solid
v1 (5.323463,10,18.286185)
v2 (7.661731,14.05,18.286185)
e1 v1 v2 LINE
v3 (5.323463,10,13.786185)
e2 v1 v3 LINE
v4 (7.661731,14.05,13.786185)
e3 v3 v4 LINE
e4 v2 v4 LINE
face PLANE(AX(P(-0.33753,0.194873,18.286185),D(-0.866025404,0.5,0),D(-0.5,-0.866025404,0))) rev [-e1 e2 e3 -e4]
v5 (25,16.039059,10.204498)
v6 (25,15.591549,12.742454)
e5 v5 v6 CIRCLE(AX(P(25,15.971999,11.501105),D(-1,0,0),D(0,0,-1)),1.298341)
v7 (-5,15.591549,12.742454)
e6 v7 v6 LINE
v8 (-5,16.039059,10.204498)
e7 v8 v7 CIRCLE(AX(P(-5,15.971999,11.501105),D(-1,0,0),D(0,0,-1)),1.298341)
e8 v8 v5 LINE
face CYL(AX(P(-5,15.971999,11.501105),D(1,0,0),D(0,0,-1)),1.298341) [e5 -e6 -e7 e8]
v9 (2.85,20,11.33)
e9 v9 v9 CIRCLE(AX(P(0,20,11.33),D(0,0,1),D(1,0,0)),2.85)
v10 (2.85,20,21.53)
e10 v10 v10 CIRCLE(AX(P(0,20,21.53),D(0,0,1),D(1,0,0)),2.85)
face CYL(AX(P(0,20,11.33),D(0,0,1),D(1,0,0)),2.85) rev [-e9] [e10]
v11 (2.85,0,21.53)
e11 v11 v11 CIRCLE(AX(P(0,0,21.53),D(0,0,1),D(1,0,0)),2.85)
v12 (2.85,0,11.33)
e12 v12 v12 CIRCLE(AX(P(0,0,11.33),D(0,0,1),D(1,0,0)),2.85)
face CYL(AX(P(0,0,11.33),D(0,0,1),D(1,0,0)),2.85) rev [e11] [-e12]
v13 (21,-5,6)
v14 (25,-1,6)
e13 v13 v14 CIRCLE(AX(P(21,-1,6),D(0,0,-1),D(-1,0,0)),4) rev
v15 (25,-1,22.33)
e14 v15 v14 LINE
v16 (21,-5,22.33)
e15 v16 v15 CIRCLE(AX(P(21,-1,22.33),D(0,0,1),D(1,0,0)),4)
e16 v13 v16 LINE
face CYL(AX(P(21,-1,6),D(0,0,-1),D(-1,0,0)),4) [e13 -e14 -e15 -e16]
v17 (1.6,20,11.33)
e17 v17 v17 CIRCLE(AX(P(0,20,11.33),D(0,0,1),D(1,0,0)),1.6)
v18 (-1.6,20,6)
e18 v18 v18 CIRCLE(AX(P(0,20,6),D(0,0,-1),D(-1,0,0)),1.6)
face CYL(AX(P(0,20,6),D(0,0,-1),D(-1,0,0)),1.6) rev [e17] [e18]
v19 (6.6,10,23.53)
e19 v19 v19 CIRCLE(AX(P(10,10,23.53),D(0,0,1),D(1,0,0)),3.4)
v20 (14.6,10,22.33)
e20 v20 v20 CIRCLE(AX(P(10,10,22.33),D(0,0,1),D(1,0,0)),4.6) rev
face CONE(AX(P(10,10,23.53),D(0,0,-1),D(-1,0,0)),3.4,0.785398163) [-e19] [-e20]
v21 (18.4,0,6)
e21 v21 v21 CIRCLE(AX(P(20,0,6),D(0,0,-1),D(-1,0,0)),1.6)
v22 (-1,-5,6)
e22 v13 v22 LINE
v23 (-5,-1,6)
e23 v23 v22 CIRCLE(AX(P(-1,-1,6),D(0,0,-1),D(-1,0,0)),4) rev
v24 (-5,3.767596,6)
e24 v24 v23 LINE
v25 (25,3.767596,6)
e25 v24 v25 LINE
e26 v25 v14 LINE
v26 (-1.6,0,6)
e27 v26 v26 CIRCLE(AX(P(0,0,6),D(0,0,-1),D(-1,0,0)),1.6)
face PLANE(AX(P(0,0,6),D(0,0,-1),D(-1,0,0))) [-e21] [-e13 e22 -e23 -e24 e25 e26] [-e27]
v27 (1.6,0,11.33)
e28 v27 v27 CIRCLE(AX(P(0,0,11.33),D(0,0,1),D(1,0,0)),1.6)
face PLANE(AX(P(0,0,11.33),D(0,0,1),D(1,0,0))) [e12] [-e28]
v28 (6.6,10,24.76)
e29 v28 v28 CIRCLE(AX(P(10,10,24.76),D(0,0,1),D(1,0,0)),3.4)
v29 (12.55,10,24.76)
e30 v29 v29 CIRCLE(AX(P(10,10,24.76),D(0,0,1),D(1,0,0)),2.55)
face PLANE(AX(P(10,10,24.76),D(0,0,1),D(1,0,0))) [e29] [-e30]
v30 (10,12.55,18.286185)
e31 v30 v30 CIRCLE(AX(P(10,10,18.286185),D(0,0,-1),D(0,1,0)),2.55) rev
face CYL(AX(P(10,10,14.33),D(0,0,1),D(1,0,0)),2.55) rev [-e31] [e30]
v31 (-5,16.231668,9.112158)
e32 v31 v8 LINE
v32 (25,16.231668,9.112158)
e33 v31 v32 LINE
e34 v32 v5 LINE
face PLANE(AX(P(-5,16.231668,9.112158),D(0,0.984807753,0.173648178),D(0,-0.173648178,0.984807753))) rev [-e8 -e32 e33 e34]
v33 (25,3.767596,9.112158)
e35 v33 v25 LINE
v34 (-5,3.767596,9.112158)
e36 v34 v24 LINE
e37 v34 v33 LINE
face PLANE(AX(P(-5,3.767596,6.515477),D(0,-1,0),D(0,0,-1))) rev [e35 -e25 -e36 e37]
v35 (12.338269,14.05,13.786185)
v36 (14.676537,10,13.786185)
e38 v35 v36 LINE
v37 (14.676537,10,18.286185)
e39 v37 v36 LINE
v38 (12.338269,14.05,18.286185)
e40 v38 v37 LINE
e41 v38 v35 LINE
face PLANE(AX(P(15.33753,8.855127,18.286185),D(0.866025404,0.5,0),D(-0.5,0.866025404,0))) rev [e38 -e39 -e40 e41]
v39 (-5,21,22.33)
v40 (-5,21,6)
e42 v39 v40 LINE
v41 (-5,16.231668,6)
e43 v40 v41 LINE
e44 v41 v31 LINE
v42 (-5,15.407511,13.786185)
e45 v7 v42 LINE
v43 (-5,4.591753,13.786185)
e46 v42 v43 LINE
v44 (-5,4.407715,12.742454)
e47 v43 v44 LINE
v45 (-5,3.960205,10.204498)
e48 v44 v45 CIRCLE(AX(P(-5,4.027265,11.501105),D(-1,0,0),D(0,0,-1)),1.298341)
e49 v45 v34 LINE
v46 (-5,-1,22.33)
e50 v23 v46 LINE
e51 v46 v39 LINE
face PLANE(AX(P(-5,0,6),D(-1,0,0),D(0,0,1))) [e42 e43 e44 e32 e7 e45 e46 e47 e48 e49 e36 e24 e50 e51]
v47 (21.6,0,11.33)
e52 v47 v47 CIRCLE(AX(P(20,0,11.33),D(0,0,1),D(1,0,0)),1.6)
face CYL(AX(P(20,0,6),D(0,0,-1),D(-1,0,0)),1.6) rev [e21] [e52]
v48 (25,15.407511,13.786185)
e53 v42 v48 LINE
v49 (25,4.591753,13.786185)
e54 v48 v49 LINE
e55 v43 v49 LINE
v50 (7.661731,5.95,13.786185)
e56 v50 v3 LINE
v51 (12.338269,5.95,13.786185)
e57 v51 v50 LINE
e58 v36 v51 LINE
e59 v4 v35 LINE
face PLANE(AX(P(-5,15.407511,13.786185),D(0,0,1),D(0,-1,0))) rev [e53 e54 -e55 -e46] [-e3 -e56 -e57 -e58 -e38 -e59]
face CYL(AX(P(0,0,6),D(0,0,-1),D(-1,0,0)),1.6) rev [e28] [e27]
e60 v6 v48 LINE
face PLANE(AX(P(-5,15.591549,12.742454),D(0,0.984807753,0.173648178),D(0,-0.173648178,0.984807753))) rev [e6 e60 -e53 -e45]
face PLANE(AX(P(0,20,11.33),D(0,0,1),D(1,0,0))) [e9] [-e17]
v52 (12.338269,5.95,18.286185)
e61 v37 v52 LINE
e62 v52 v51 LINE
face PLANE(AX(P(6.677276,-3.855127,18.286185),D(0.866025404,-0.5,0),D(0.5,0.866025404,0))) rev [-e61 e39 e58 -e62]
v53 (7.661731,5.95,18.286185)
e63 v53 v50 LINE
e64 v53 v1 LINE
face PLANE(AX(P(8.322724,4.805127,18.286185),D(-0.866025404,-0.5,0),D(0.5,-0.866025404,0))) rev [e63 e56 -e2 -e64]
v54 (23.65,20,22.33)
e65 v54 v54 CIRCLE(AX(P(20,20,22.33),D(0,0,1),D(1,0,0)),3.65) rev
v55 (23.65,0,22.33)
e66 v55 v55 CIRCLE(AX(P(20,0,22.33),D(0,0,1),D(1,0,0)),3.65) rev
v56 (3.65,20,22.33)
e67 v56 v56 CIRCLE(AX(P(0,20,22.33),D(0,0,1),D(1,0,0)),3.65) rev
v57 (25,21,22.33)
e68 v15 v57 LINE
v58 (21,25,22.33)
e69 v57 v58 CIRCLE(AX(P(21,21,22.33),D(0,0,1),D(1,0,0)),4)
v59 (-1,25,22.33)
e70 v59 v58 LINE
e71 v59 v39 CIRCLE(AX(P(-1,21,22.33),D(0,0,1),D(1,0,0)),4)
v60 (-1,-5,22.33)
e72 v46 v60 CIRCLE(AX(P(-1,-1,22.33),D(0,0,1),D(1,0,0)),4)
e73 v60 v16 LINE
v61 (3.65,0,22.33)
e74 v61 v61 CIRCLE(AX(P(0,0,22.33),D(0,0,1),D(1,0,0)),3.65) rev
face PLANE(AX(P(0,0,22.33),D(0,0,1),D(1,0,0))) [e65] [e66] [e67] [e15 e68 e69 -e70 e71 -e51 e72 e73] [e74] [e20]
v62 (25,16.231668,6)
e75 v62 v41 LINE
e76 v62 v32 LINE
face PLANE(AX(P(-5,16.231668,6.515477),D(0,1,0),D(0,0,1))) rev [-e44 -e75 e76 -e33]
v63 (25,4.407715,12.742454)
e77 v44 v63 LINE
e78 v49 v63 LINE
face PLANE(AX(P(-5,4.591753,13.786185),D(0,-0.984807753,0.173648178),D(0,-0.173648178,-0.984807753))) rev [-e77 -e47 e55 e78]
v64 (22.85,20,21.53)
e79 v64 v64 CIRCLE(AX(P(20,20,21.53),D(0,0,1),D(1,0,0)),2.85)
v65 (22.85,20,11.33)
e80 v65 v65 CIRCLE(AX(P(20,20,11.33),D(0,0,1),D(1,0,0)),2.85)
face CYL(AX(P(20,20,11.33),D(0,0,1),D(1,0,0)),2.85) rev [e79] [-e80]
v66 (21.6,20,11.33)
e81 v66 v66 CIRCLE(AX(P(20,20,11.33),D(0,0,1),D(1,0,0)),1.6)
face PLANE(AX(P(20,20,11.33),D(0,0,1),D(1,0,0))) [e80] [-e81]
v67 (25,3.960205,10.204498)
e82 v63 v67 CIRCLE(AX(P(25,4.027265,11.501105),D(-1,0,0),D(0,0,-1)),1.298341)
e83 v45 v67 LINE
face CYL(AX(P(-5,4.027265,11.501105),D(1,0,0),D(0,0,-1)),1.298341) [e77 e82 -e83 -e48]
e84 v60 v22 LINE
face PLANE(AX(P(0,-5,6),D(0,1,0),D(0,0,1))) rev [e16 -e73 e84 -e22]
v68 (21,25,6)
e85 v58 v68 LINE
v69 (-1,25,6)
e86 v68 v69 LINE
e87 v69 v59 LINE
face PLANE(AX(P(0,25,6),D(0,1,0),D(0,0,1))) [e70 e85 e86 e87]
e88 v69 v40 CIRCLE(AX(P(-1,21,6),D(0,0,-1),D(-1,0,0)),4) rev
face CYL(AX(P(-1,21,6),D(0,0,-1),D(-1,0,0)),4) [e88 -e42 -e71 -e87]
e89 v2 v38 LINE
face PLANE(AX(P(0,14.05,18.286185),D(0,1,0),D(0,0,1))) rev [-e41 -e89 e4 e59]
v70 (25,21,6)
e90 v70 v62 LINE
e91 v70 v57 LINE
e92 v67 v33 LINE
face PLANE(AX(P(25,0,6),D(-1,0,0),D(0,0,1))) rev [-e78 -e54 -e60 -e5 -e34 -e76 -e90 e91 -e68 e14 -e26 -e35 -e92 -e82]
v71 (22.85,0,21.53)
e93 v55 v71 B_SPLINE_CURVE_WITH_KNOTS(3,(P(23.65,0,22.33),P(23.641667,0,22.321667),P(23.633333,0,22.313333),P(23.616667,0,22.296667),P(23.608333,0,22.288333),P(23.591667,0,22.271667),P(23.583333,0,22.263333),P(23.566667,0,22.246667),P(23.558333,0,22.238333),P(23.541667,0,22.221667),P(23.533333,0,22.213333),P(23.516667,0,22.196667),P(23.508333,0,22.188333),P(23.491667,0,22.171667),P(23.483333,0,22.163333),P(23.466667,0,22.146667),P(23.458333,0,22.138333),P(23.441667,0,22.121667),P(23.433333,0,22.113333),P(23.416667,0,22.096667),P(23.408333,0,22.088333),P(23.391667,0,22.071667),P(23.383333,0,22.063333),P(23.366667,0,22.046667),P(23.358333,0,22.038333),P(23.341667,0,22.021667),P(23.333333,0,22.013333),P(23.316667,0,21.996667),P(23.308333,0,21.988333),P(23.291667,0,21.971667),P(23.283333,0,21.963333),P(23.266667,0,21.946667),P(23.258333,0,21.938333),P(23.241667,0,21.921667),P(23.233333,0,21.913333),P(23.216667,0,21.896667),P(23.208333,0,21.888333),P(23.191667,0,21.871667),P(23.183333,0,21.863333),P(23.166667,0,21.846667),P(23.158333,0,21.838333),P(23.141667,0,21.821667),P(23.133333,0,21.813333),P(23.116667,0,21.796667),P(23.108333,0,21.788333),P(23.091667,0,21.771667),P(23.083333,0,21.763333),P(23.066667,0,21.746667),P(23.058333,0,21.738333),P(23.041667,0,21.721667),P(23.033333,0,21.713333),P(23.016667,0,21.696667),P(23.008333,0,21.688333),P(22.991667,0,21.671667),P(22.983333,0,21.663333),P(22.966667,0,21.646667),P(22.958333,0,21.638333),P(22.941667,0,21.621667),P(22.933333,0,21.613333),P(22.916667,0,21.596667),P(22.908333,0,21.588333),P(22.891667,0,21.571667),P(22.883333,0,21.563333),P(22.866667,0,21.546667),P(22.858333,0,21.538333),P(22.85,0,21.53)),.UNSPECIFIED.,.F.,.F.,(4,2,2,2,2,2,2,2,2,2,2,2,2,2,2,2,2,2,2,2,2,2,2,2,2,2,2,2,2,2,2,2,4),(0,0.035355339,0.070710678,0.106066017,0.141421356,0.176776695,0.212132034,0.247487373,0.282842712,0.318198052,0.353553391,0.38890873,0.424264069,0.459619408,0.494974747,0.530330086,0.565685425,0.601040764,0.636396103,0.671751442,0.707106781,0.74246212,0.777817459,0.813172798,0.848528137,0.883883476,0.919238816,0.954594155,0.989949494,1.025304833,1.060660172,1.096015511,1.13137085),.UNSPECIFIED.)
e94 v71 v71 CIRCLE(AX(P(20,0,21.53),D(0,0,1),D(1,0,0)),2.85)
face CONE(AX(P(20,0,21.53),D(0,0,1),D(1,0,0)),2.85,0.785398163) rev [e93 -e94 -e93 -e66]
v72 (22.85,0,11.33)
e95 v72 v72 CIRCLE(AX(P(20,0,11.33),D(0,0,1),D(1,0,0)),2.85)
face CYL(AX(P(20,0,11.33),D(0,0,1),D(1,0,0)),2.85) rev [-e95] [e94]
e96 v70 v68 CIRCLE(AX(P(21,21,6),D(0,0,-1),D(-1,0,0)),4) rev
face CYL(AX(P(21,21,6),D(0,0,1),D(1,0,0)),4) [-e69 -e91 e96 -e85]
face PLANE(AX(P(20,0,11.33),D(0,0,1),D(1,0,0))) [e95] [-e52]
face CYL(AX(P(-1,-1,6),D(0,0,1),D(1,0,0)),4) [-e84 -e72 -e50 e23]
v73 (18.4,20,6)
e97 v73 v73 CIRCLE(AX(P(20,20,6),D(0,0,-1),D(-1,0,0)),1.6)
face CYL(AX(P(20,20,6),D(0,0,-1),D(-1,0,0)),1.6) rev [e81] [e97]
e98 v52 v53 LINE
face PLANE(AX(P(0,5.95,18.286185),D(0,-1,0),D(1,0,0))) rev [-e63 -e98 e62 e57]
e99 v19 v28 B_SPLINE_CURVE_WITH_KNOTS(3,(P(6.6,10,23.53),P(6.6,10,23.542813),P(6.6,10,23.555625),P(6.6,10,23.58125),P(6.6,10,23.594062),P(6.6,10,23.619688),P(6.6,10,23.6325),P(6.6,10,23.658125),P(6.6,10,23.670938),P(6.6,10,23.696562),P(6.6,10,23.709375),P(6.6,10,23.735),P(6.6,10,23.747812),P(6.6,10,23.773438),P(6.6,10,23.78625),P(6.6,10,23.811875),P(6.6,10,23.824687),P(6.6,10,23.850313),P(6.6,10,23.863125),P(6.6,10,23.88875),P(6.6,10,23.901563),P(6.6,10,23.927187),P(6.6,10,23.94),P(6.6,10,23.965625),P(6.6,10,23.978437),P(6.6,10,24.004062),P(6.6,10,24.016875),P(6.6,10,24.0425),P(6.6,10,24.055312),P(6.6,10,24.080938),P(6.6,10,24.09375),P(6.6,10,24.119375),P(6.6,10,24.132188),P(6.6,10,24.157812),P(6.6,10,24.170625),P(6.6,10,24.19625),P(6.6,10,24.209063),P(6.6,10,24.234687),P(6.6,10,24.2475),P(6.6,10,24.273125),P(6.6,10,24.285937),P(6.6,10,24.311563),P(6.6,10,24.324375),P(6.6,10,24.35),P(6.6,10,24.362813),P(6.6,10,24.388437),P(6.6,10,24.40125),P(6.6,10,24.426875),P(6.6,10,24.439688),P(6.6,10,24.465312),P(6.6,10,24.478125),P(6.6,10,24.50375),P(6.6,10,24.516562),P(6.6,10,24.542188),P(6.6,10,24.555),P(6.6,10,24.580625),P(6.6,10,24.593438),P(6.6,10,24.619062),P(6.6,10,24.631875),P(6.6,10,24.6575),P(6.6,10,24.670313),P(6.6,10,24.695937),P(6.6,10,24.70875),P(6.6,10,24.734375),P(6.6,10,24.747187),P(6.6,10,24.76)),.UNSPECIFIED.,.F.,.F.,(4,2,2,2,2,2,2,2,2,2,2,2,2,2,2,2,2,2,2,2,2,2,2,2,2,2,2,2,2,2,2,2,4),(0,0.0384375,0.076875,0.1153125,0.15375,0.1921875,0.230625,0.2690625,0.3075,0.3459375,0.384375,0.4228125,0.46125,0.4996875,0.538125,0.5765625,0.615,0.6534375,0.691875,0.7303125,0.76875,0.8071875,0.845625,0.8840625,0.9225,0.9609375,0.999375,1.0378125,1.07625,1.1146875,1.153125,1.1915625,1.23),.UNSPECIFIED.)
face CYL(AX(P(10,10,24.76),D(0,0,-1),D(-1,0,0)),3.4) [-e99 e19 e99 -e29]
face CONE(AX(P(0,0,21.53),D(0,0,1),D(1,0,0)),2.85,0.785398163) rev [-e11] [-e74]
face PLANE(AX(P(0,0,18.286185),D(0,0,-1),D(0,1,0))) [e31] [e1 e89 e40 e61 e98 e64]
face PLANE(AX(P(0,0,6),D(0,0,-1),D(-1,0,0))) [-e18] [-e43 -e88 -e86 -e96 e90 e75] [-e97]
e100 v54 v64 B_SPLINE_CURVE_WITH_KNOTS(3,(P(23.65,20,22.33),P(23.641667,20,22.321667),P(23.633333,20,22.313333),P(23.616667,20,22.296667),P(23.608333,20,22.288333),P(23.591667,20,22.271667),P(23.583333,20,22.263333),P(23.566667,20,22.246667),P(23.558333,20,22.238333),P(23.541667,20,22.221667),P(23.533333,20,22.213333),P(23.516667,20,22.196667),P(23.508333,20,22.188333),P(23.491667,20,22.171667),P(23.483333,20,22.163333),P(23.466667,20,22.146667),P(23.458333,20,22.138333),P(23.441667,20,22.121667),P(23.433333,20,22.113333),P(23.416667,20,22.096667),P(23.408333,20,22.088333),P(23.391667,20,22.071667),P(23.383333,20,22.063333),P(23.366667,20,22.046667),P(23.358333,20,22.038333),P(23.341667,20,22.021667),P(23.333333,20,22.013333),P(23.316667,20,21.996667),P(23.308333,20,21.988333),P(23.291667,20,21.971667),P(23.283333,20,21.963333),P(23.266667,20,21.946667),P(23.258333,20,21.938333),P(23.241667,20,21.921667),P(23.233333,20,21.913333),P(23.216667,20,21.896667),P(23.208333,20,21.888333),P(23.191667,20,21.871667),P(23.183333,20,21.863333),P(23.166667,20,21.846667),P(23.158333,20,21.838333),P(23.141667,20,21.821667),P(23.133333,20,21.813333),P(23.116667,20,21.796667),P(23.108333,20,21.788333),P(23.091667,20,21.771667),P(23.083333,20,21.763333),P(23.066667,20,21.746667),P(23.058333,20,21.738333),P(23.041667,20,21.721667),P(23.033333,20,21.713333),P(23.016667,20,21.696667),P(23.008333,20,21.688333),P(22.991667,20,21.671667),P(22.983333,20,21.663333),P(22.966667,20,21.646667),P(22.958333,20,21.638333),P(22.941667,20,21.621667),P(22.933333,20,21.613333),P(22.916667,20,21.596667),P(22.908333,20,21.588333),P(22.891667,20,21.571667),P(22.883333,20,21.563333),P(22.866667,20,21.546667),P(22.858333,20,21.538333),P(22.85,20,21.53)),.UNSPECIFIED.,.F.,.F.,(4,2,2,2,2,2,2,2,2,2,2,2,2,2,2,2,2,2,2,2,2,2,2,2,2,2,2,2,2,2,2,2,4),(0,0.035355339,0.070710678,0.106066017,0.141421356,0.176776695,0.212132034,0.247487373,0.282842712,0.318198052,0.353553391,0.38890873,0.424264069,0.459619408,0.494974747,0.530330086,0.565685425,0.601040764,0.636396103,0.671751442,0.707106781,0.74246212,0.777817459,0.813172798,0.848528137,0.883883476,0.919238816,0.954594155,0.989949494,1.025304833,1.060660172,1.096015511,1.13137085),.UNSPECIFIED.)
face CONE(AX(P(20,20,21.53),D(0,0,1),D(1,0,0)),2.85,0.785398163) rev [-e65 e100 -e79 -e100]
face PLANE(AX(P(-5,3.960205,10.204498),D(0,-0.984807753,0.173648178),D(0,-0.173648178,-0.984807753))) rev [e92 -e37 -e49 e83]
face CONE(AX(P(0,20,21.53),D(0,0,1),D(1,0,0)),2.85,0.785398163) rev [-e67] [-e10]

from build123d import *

# Parameters (mm, degrees)
SKETCH1_W                  = 30
SKETCH1_H                  = 30
SKETCH1_R                  = 1.6
SKETCH1_W_2                = 70
SKETCH1_H_2                = 12
BOSS_EXTRUDE1_DEPTH        = 6
SKETCH1_3_W                = 30
SKETCH1_3_H                = 30
SKETCH1_3_R                = 1.6
BOSS_EXTRUDE2_DEPTH        = 22.33
CUT_EXTRUDE1_DEPTH         = 78.612040947
SKETCH3_R                  = 2.55
CUT_EXTRUDE2_DEPTH         = 8
CUT_EXTRUDE3_DEPTH         = 4.5
SKETCH6_R                  = 5
CUT_EXTRUDE5_DEPTH         = 8.6
SKETCH7_R                  = 1.6
CUT_EXTRUDE6_DEPTH         = 101.740403513
SKETCH8_R                  = 2.85
CUT_EXTRUDE7_DEPTH         = 11
BOSS_EXTRUDE3_START        = 2.43
SKETCH9_R                  = 3.4
SKETCH9_R_2                = 2.55
BOSS_EXTRUDE3_DEPTH        = 2.43
CHAMFER1_SIZE              = 1.2
FILLET3_R                  = 4
CHAMFER2_SIZE              = 0.8
CUT_EXTRUDE8_DEPTH         = 3
CHAMFER3_SIZE              = 0.8
LPATTERN1_COUNT            = 3
LPATTERN1_PITCH            = 25
CHAMFER3_OF_LPATTERN1_SIZE = 0.8
SKETCH12_W                 = 103.210606925
SKETCH12_H                 = 33.832940417
CUT_EXTRUDE9_DEPTH         = 6


with BuildPart() as part:
    # Sketch1 → Boss-Extrude1 (new body)
    # profile 1 of 2: a face of its own
    with BuildSketch(Plane.XY):
        with Locations((10, 10)):
            Rectangle(SKETCH1_W, SKETCH1_H)
        with Locations((20, 0)):
            Circle(SKETCH1_R, mode=Mode.SUBTRACT)
        with Locations((20, 20)):
            Circle(SKETCH1_R, mode=Mode.SUBTRACT)
        with Locations((0, 20)):
            Circle(SKETCH1_R, mode=Mode.SUBTRACT)
        Circle(SKETCH1_R, mode=Mode.SUBTRACT)
    # profile 2 of 2: a face of its own
    with BuildSketch(Plane.XY):
        with Locations((60, 10)):
            Rectangle(SKETCH1_W_2, SKETCH1_H_2)
    extrude(amount=BOSS_EXTRUDE1_DEPTH)

    # Sketch1<3> → Boss-Extrude2 (add)
    with BuildSketch(Plane.XY):
        with Locations((10, 10)):
            Rectangle(SKETCH1_3_W, SKETCH1_3_H)
        with Locations((20, 0)):
            Circle(SKETCH1_3_R, mode=Mode.SUBTRACT)
        with Locations((20, 20)):
            Circle(SKETCH1_3_R, mode=Mode.SUBTRACT)
        with Locations((0, 20)):
            Circle(SKETCH1_3_R, mode=Mode.SUBTRACT)
        Circle(SKETCH1_3_R, mode=Mode.SUBTRACT)
    extrude(amount=BOSS_EXTRUDE2_DEPTH)

    # Sketch2 → Cut-Extrude1 (cut, through all)
    with BuildSketch(Plane(origin=(25, 0, 0), x_dir=(0, 0, -1), z_dir=(1, 0, 0))):
        with BuildLine():
            Line((-6.515476918, 16.231667643), (-9.112158418, 16.231667643))
            Line((-9.112158418, 16.231667643), (-10.20449761, 16.039058771))
            ThreePointArc((-10.20449761, 16.039058771), (-11.275650893, 14.693383456), (-12.742453793, 15.59154862))
            Line((-12.742453793, 15.59154862), (-13.786185118, 15.407510627))
            Line((-13.786185118, 15.407510627), (-13.786185118, 4.591753459))
            Line((-13.786185118, 4.591753459), (-12.742453793, 4.407715465))
            ThreePointArc((-12.742453793, 4.407715465), (-11.275650893, 5.305880629), (-10.20449761, 3.960205314))
            Line((-10.20449761, 3.960205314), (-9.112158418, 3.767596443))
            Line((-9.112158418, 3.767596443), (-6.515476918, 3.767596443))
            Line((-6.515476918, 3.767596443), (-5.902540869, 3.767596443))
            Line((-5.902540869, 3.767596443), (-5.902540869, 16.231667643))
            Line((-5.902540869, 16.231667643), (-6.515476918, 16.231667643))
        make_face()
    extrude(amount=-CUT_EXTRUDE1_DEPTH, mode=Mode.SUBTRACT)

    # Sketch3 → Cut-Extrude2 (cut)
    with BuildSketch(Plane.XY.offset(22.33)):
        with Locations((10, 10)):
            Circle(SKETCH3_R)
    extrude(amount=-CUT_EXTRUDE2_DEPTH, mode=Mode.SUBTRACT)

    # Sketch5 → Cut-Extrude3 (cut)
    with BuildSketch(Plane(origin=(0, 0, 13.786185118), x_dir=(-1, 0, 0), z_dir=(0, 0, -1))):
        Polygon((-5.32346282, 10), (-7.66173141, 14.05), (-12.33826859, 14.05), (-14.67653718, 10), (-12.33826859, 5.95), (-7.66173141, 5.95), align=None)
    extrude(amount=-CUT_EXTRUDE3_DEPTH, mode=Mode.SUBTRACT)

    # Sketch6 → Cut-Extrude5 (cut)
    with BuildSketch(Plane(origin=(0, 0, 0), x_dir=(-1, 0, 0), z_dir=(0, 0, -1))):
        with Locations((-10, 10)):
            Circle(SKETCH6_R)
    extrude(amount=-CUT_EXTRUDE5_DEPTH, mode=Mode.SUBTRACT)

    # Sketch7 → Cut-Extrude6 (cut, through all)
    with BuildSketch(Plane(origin=(0, 0, 0), x_dir=(-1, 0, 0), z_dir=(0, 0, -1))):
        with BuildLine():
            ThreePointArc((-90.1, 10), (-88.5, 8.4), (-86.9, 10))
            Line((-86.9, 10), (-90.1, 10))
        make_face()
        with BuildLine():
            Line((-90.1, 10), (-86.9, 10))
            ThreePointArc((-86.9, 10), (-88.5, 11.6), (-90.1, 10))
        make_face()
        with Locations((-63.5, 10)):
            Circle(SKETCH7_R)
        with Locations((-38.5, 10)):
            Circle(SKETCH7_R)
    extrude(amount=-CUT_EXTRUDE6_DEPTH, mode=Mode.SUBTRACT)

    # Sketch8 → Cut-Extrude7 (cut)
    with BuildSketch(Plane.XY.offset(22.33)):
        with Locations((20, 20)):
            Circle(SKETCH8_R)
        with Locations((20, 0)):
            Circle(SKETCH8_R)
        Circle(SKETCH8_R)
        with Locations((0, 20)):
            Circle(SKETCH8_R)
    extrude(amount=-CUT_EXTRUDE7_DEPTH, mode=Mode.SUBTRACT)

    # Sketch9 → Boss-Extrude3 (add)
    with BuildSketch(Plane.XY.offset(22.33).offset(BOSS_EXTRUDE3_START)):
        with Locations(Location((10, 10, 0), (0, 0, 180))):
            Circle(SKETCH9_R)
        with Locations((10, 10)):
            Circle(SKETCH9_R_2, mode=Mode.SUBTRACT)
    extrude(amount=-BOSS_EXTRUDE3_DEPTH)

    # Chamfer1
    chamfer1_edges = [part.edges().sort_by_distance(p)[0] for p in [
        (13.4, 10, 22.33),
    ]]
    chamfer(chamfer1_edges, length=CHAMFER1_SIZE)

    # Fillet3
    # the kernel refuses this fillet: 4 mm, written as the material it adds along each edge
    with BuildSketch(Plane(origin=(25, 4, 0), x_dir=(0, -1, 0), z_dir=(0, 0, 1))) as fillet3_piece_1:
        with BuildLine():
            CenterArc((FILLET3_R, FILLET3_R), FILLET3_R, 180, 90)
            Line((0, FILLET3_R), (0, 0))
            Line((0, 0), (FILLET3_R, 0))
        make_face()
    extrude(amount=5.902540869)
    with BuildSketch(Plane(origin=(25, 16, 0), x_dir=(0, 1, 0), z_dir=(0, 0, 1))) as fillet3_piece_2:
        with BuildLine():
            CenterArc((FILLET3_R, -FILLET3_R), FILLET3_R, 90, 90)
            Line((0, -FILLET3_R), (0, 0))
            Line((0, 0), (FILLET3_R, 0))
        make_face()
    extrude(amount=5.902540869)
    # the kernel refuses this fillet: 4 mm, written as the material it takes off along each edge
    with BuildSketch(Plane(origin=(-5, -5, 32.33), x_dir=(1, 0, 0), z_dir=(0, 0, -1)), Plane(origin=(-5, 25, 32.33), x_dir=(0, -1, 0), z_dir=(0, 0, -1)), Plane(origin=(25, 25, -10), x_dir=(0, -1, 0), z_dir=(0, 0, 1)), Plane(origin=(25, -5, -10), x_dir=(-1, 0, 0), z_dir=(0, 0, 1))) as fillet3_2_piece_1:
        with BuildLine():
            CenterArc((FILLET3_R, -FILLET3_R), FILLET3_R, 90, 90)
            Line((0, -FILLET3_R), (0, 0))
            Line((0, 0), (FILLET3_R, 0))
        make_face()
    extrude(amount=42.33, mode=Mode.SUBTRACT)
    with BuildSketch(Plane(origin=(95, 16, -10), x_dir=(-1, 0, 0), z_dir=(0, 0, 1))) as fillet3_2_piece_2:
        with BuildLine():
            CenterArc((FILLET3_R, FILLET3_R), FILLET3_R, 180, 90)
            Line((0, FILLET3_R), (0, 0))
            Line((0, 0), (FILLET3_R, 0))
        make_face()
    extrude(amount=26, mode=Mode.SUBTRACT)
    with BuildSketch(Plane(origin=(95, 4, -10), x_dir=(-1, 0, 0), z_dir=(0, 0, 1))) as fillet3_2_piece_3:
        with BuildLine():
            CenterArc((FILLET3_R, -FILLET3_R), FILLET3_R, 90, 90)
            Line((0, -FILLET3_R), (0, 0))
            Line((0, 0), (FILLET3_R, 0))
        make_face()
    extrude(amount=26, mode=Mode.SUBTRACT)

    # Chamfer2
    chamfer2_edges = [part.edges().sort_by_distance(p)[0] for p in [
        (-2.85, 20, 22.33),
        (-2.85, 0, 22.33),
        (17.15, 0, 22.33),
        (17.15, 20, 22.33),
    ]]
    chamfer(chamfer2_edges, length=CHAMFER2_SIZE)

    # Sketch10 → Cut-Extrude8 (cut)
    with BuildSketch(Plane(origin=(0, 0, 0), x_dir=(-1, 0, 0), z_dir=(0, 0, -1))):
        Polygon((-85.266838493, 10), (-86.883419246, 12.8), (-90.116580754, 12.8), (-91.733161507, 10), (-90.116580754, 7.2), (-86.883419246, 7.2), align=None)
    cut_extrude8 = extrude(amount=-CUT_EXTRUDE8_DEPTH, mode=Mode.SUBTRACT)

    # Chamfer3
    chamfer3_edges = [part.edges().sort_by_distance(p)[0] for p in [
        (86.075128869, 8.6, 0),
        (86.075128869, 11.4, 0),
        (88.5, 12.8, 0),
        (90.924871131, 11.4, 0),
        (90.924871131, 8.6, 0),
        (88.5, 7.2, 0),
    ]]
    chamfer(chamfer3_edges, length=CHAMFER3_SIZE)

    # LPattern1: Cut-Extrude8 ×3
    with Locations(*[(-i * LPATTERN1_PITCH, 0, 0) for i in range(1, LPATTERN1_COUNT)]):
        add(cut_extrude8, mode=Mode.SUBTRACT)

    # Chamfer3 of LPattern1
    chamfer3_of_lpattern1_edges = [part.edges().sort_by_distance(p)[0] for p in [
        (61.075128869, 8.6, 0),
        (61.075128869, 11.4, 0),
        (63.5, 12.8, 0),
        (65.924871131, 11.4, 0),
        (65.924871131, 8.6, 0),
        (63.5, 7.2, 0),
        (36.075128869, 8.6, 0),
        (36.075128869, 11.4, 0),
        (38.5, 12.8, 0),
        (40.924871131, 11.4, 0),
        (40.924871131, 8.6, 0),
        (38.5, 7.2, 0),
    ]]
    chamfer(chamfer3_of_lpattern1_edges, length=CHAMFER3_OF_LPATTERN1_SIZE)

    # Sketch12 → Cut-Extrude9 (cut)
    with BuildSketch(Plane(origin=(0, 0, 0), x_dir=(-1, 0, 0), z_dir=(0, 0, -1))):
        with Locations((-45.050346637, 9.848960088)):
            Rectangle(SKETCH12_W, SKETCH12_H)
    extrude(amount=-CUT_EXTRUDE9_DEPTH, mode=Mode.SUBTRACT)


solid = part.part
